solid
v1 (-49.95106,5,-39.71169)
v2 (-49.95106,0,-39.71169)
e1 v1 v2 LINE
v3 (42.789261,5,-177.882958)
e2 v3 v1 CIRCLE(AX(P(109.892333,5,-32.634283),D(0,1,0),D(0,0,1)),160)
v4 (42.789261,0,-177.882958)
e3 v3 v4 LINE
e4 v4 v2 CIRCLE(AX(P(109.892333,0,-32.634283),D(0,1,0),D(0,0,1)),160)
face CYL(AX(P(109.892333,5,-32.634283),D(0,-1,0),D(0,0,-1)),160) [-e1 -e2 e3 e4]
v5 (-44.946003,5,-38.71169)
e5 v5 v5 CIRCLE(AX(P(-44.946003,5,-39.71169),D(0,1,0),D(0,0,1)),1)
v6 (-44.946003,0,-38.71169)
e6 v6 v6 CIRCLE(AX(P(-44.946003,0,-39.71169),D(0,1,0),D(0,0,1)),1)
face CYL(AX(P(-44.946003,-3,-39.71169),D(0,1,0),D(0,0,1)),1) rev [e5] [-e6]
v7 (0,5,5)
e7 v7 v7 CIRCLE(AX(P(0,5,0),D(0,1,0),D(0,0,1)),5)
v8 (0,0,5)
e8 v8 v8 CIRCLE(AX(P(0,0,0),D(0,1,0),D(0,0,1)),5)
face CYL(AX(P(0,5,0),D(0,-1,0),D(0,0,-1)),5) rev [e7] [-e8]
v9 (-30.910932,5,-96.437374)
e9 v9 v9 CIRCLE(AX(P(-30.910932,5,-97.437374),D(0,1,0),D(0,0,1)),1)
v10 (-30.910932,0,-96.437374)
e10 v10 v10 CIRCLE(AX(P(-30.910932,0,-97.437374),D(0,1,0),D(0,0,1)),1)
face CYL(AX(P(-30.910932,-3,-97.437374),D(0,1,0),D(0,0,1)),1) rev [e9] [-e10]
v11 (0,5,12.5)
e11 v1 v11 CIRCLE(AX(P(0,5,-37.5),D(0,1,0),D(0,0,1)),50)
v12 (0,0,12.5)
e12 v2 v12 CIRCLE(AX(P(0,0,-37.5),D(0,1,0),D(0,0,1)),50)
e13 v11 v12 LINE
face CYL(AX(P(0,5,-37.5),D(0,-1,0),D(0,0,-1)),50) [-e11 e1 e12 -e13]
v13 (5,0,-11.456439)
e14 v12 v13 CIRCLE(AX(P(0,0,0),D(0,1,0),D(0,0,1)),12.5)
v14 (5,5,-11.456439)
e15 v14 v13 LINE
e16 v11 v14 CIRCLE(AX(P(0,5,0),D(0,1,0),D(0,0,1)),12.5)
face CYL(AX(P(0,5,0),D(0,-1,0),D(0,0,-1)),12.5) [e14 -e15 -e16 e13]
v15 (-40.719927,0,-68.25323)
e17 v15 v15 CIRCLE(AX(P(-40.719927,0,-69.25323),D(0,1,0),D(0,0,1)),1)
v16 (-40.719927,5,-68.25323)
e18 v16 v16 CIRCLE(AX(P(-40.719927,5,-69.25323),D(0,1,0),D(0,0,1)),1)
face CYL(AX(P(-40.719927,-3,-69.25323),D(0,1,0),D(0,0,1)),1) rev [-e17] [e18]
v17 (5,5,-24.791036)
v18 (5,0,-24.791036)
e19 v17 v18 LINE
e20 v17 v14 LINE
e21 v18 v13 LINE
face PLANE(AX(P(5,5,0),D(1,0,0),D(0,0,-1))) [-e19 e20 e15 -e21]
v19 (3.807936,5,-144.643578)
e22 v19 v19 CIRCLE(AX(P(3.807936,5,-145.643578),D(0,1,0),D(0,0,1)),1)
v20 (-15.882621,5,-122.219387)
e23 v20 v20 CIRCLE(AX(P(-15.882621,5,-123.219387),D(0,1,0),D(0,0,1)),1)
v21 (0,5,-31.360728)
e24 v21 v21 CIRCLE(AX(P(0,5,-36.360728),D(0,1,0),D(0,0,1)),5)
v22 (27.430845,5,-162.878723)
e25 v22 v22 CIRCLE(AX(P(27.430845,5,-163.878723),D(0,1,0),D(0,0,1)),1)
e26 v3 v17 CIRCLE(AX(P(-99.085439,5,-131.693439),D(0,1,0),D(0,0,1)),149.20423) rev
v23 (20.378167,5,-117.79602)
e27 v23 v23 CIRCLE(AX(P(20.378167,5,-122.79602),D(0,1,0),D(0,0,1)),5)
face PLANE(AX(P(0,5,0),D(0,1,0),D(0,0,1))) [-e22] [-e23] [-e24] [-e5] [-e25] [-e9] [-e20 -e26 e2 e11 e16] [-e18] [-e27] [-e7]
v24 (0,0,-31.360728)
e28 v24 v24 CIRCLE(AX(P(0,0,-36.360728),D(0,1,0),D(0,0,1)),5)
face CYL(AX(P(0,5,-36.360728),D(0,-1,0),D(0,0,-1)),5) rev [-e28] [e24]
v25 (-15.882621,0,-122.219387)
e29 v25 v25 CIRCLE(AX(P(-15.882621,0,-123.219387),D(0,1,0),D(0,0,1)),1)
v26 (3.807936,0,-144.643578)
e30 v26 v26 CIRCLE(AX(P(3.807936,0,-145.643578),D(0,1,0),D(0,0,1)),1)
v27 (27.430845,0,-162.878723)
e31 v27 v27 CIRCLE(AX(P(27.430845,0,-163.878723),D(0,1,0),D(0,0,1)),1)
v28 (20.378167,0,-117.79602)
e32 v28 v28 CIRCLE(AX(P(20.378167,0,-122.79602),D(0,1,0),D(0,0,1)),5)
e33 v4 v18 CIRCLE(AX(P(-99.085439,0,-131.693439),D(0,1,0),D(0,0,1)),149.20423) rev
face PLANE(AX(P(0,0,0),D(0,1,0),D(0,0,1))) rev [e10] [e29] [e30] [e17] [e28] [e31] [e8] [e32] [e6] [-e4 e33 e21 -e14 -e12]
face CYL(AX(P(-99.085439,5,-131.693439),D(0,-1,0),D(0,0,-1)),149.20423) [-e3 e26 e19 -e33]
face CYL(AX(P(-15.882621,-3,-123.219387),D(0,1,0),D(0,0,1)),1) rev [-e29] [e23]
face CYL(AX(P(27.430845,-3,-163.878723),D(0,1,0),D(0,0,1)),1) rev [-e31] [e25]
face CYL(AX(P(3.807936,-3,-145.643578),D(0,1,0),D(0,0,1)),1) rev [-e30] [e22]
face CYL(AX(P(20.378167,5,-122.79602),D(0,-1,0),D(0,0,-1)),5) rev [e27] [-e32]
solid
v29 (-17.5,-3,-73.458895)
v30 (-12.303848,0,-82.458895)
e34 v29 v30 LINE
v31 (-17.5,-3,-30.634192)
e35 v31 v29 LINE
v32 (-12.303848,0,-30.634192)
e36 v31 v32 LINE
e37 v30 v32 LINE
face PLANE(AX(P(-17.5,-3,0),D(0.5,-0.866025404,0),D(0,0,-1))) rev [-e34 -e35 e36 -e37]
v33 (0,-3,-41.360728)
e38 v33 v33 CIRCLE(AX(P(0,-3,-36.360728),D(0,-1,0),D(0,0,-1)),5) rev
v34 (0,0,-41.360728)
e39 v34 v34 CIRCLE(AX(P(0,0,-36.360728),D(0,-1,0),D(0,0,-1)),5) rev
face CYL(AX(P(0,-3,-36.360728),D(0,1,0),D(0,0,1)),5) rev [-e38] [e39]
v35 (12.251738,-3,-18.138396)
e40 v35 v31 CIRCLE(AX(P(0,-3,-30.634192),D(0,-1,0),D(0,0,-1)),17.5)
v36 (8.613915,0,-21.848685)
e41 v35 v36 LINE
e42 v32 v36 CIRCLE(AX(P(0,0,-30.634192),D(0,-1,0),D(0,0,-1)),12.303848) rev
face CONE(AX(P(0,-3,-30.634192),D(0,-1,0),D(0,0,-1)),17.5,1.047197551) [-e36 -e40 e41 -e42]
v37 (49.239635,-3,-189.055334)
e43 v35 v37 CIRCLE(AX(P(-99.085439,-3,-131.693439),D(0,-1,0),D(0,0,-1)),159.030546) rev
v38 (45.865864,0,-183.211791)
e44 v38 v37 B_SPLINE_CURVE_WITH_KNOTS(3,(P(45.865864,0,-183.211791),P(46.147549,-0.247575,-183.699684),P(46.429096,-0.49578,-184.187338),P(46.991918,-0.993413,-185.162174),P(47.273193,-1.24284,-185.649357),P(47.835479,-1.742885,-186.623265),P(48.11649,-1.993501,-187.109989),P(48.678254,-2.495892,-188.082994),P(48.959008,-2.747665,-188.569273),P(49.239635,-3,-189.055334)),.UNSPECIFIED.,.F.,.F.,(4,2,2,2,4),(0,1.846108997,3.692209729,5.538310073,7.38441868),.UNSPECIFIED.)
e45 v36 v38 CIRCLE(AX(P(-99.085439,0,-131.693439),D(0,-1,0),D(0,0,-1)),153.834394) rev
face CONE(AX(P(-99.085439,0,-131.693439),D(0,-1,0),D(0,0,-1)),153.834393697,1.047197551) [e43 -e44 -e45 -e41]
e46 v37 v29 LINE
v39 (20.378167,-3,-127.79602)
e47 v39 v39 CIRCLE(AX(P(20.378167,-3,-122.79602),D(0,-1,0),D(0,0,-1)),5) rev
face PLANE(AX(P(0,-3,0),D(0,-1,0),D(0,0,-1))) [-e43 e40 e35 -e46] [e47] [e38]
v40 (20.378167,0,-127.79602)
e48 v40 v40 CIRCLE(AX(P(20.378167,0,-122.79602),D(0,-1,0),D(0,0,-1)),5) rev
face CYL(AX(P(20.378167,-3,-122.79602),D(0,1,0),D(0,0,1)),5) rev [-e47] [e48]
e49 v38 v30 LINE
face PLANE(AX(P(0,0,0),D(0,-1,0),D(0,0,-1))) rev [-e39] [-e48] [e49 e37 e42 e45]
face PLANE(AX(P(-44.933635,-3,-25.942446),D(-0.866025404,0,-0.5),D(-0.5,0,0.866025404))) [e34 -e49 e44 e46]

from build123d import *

# Parameters (mm, degrees)
IZIM1_R                     = 5
IZIM1_R_2                   = 12.5
Y_KSEKLIK_EKSTR_ZYON1_DEPTH = 5
IZIM2_R                     = 5
BLADE_DEPTH                 = 3
PAH1_SIZE                   = 3
PAH1_SIZE_2                 = 5.196152423
IZIM3_R                     = 1
KANCA_DELIKLERI_DEPTH       = 199.49265783


with BuildPart() as part:
    # Çizim1 → Yükseklik-Ekstrüzyon1 (new body)
    # profile 1 of 2: a face of its own
    with BuildSketch(Plane(origin=(0, 0, 0), x_dir=(1, 0, 0), z_dir=(0, 1, 0))):
        with BuildLine():
            Line((5, 11.456439237), (5, 24.791036465))
            ThreePointArc((5, 24.791036465), (45.770978253, 95.93703242), (42.789260889, 177.882958308))
            ThreePointArc((42.789260889, 177.882958308), (-22.95720379, 121.802666414), (-49.951060338, 39.711689653))
            ThreePointArc((-49.951060338, 39.711689653), (-36.128828397, 2.935455179), (0, -12.5))
            ThreePointArc((0, -12.5), (-12.236328912, 2.553870546), (5, 11.456439237))
        make_face()
        with Locations(Location((0, 36.360727505, 0), (0, 0, 270))):
            Circle(IZIM1_R, mode=Mode.SUBTRACT)
        with Locations(Location((20.378166684, 122.796020062, 0), (0, 0, 270))):
            Circle(IZIM1_R, mode=Mode.SUBTRACT)
    # profile 2 of 2: a face of its own
    with BuildSketch(Plane(origin=(0, 0, 0), x_dir=(1, 0, 0), z_dir=(0, 1, 0))):
        Circle(IZIM1_R_2)
        with Locations(Location((0, 0, 0), (0, 0, 270))):
            Circle(IZIM1_R, mode=Mode.SUBTRACT)
    extrude(amount=Y_KSEKLIK_EKSTR_ZYON1_DEPTH)

    # Çizim3 → kanca delikleri (cut, through all)
    with BuildSketch(Plane(origin=(0, 5, 0), x_dir=(1, 0, 0), z_dir=(0, 1, 0))):
        with Locations(Location((27.43084459, 163.878722536, 0), (0, 0, 270))):
            Circle(IZIM3_R)
        with Locations(Location((3.807935712, 145.643577542, 0), (0, 0, 270))):
            Circle(IZIM3_R)
        with Locations(Location((-15.882620678, 123.219386901, 0), (0, 0, 270))):
            Circle(IZIM3_R)
        with Locations(Location((-30.910932055, 97.437373908, 0), (0, 0, 270))):
            Circle(IZIM3_R)
        with Locations(Location((-40.719926699, 69.253230123, 0), (0, 0, 270))):
            Circle(IZIM3_R)
        with Locations(Location((-44.94600331, 39.711689653, 0), (0, 0, 270))):
            Circle(IZIM3_R)
    extrude(amount=-KANCA_DELIKLERI_DEPTH, mode=Mode.SUBTRACT)


with BuildPart() as body_2:
    # Çizim2 → blade (new body)
    # profile 1 of 4: a face of its own
    with BuildSketch(Plane.XZ):
        with BuildLine():
            ThreePointArc((-17.5, -30.634192166), (-3.274683301, -47.825074903), (16.274451346, -37.067871781))
            ThreePointArc((16.274451346, -37.067871781), (10.808797948, -30.77189045), (5, -24.791036465))
            Line((5, -24.791036465), (5, -13.863682335))
            ThreePointArc((5, -13.863682335), (-10.458250332, -16.602976965), (-17.5, -30.634192166))
        make_face()
        with Locations(Location((0, -36.360727505, 0), (0, 0, 270))):
            Circle(IZIM2_R, mode=Mode.SUBTRACT)
    # profile 2 of 4: a face of its own
    with BuildSketch(Plane.XZ):
        with BuildLine():
            Line((-17.5, -73.458895297), (42.789260889, -177.882958308))
            ThreePointArc((42.789260889, -177.882958308), (47.54208487, -104.084174823), (16.274451346, -37.067871781))
            ThreePointArc((16.274451346, -37.067871781), (-3.274683301, -47.825074903), (-17.5, -30.634192166))
            Line((-17.5, -30.634192166), (-17.5, -73.458895297))
        make_face()
        with Locations(Location((20.378166684, -122.796020062, 0), (0, 0, 270))):
            Circle(IZIM2_R, mode=Mode.SUBTRACT)
    # profile 3 of 4: a face of its own
    with BuildSketch(Plane.XZ):
        with BuildLine():
            Line((42.789260889, -177.882958308), (49.239635028, -189.055334043))
            ThreePointArc((49.239635028, -189.055334043), (56.347089994, -98.056501036), (12.251738073, -18.138396305))
            ThreePointArc((12.251738073, -18.138396305), (16.134674095, -23.857593324), (17.5, -30.634192166))
            ThreePointArc((17.5, -30.634192166), (17.190882737, -33.908875467), (16.274451346, -37.067871781))
            ThreePointArc((16.274451346, -37.067871781), (47.54208487, -104.084174823), (42.789260889, -177.882958308))
        make_face()
    # profile 4 of 4: a face of its own
    with BuildSketch(Plane.XZ):
        with BuildLine():
            ThreePointArc((17.5, -30.634192166), (16.134674095, -23.857593324), (12.251738073, -18.138396305))
            ThreePointArc((12.251738073, -18.138396305), (8.886726704, -15.558513459), (5, -13.863682335))
            Line((5, -13.863682335), (5, -24.791036465))
            ThreePointArc((5, -24.791036465), (10.808797948, -30.77189045), (16.274451346, -37.067871781))
            ThreePointArc((16.274451346, -37.067871781), (17.190882737, -33.908875467), (17.5, -30.634192166))
        make_face()
    extrude(amount=BLADE_DEPTH)

    # Pah1
    # the kernel refuses this chamfer: 5.196152423, 3 mm, written as the material it takes off along each edge
    with BuildSketch(Plane(origin=(-17.5, 0, -30.634192166), x_dir=(-0.05789386240267091, -0.9983227437537926, 0), z_dir=(0, 0, -1))) as pah1_piece_1:
        Polygon((PAH1_SIZE * 0.998322743754, -PAH1_SIZE * 0.0578938624027), (-PAH1_SIZE_2 * 0.0578938623994, -PAH1_SIZE_2 * 0.998322743697), (0, 0), align=None)
    extrude(amount=56.267595043, mode=Mode.SUBTRACT)
    with BuildSketch(Plane(origin=(0, 0, -30.634192166), x_dir=(0.7000993184445534, 0, 0.7140454777627765), z_dir=(0.7140454777627765, 0, -0.7000993184445534))) as pah1_piece_2:
        Polygon((17.5, PAH1_SIZE), (17.5 - PAH1_SIZE_2, 0), (17.5, 0), align=None)
    revolve(axis=Axis((0, 0, -30.634192166), (0, -1, 0)), revolution_arc=134.434972877, mode=Mode.SUBTRACT)
    with BuildSketch(Plane(origin=(-99.085438878, 0, -131.693438588), x_dir=(0.8988910106587495, 0, -0.43817228456041324), z_dir=(-0.43817228456041324, 0, -0.8988910106587495))) as pah1_piece_3:
        Polygon((159.03054612, PAH1_SIZE), (159.03054612 - PAH1_SIZE_2, 0), (159.03054612, 0), align=None)
    revolve(axis=Axis((-99.085438878, 0, -131.693438588), (0, -1, 0)), revolution_arc=71.552350858, mode=Mode.SUBTRACT)


solid = Compound([part.part, body_2.part])
